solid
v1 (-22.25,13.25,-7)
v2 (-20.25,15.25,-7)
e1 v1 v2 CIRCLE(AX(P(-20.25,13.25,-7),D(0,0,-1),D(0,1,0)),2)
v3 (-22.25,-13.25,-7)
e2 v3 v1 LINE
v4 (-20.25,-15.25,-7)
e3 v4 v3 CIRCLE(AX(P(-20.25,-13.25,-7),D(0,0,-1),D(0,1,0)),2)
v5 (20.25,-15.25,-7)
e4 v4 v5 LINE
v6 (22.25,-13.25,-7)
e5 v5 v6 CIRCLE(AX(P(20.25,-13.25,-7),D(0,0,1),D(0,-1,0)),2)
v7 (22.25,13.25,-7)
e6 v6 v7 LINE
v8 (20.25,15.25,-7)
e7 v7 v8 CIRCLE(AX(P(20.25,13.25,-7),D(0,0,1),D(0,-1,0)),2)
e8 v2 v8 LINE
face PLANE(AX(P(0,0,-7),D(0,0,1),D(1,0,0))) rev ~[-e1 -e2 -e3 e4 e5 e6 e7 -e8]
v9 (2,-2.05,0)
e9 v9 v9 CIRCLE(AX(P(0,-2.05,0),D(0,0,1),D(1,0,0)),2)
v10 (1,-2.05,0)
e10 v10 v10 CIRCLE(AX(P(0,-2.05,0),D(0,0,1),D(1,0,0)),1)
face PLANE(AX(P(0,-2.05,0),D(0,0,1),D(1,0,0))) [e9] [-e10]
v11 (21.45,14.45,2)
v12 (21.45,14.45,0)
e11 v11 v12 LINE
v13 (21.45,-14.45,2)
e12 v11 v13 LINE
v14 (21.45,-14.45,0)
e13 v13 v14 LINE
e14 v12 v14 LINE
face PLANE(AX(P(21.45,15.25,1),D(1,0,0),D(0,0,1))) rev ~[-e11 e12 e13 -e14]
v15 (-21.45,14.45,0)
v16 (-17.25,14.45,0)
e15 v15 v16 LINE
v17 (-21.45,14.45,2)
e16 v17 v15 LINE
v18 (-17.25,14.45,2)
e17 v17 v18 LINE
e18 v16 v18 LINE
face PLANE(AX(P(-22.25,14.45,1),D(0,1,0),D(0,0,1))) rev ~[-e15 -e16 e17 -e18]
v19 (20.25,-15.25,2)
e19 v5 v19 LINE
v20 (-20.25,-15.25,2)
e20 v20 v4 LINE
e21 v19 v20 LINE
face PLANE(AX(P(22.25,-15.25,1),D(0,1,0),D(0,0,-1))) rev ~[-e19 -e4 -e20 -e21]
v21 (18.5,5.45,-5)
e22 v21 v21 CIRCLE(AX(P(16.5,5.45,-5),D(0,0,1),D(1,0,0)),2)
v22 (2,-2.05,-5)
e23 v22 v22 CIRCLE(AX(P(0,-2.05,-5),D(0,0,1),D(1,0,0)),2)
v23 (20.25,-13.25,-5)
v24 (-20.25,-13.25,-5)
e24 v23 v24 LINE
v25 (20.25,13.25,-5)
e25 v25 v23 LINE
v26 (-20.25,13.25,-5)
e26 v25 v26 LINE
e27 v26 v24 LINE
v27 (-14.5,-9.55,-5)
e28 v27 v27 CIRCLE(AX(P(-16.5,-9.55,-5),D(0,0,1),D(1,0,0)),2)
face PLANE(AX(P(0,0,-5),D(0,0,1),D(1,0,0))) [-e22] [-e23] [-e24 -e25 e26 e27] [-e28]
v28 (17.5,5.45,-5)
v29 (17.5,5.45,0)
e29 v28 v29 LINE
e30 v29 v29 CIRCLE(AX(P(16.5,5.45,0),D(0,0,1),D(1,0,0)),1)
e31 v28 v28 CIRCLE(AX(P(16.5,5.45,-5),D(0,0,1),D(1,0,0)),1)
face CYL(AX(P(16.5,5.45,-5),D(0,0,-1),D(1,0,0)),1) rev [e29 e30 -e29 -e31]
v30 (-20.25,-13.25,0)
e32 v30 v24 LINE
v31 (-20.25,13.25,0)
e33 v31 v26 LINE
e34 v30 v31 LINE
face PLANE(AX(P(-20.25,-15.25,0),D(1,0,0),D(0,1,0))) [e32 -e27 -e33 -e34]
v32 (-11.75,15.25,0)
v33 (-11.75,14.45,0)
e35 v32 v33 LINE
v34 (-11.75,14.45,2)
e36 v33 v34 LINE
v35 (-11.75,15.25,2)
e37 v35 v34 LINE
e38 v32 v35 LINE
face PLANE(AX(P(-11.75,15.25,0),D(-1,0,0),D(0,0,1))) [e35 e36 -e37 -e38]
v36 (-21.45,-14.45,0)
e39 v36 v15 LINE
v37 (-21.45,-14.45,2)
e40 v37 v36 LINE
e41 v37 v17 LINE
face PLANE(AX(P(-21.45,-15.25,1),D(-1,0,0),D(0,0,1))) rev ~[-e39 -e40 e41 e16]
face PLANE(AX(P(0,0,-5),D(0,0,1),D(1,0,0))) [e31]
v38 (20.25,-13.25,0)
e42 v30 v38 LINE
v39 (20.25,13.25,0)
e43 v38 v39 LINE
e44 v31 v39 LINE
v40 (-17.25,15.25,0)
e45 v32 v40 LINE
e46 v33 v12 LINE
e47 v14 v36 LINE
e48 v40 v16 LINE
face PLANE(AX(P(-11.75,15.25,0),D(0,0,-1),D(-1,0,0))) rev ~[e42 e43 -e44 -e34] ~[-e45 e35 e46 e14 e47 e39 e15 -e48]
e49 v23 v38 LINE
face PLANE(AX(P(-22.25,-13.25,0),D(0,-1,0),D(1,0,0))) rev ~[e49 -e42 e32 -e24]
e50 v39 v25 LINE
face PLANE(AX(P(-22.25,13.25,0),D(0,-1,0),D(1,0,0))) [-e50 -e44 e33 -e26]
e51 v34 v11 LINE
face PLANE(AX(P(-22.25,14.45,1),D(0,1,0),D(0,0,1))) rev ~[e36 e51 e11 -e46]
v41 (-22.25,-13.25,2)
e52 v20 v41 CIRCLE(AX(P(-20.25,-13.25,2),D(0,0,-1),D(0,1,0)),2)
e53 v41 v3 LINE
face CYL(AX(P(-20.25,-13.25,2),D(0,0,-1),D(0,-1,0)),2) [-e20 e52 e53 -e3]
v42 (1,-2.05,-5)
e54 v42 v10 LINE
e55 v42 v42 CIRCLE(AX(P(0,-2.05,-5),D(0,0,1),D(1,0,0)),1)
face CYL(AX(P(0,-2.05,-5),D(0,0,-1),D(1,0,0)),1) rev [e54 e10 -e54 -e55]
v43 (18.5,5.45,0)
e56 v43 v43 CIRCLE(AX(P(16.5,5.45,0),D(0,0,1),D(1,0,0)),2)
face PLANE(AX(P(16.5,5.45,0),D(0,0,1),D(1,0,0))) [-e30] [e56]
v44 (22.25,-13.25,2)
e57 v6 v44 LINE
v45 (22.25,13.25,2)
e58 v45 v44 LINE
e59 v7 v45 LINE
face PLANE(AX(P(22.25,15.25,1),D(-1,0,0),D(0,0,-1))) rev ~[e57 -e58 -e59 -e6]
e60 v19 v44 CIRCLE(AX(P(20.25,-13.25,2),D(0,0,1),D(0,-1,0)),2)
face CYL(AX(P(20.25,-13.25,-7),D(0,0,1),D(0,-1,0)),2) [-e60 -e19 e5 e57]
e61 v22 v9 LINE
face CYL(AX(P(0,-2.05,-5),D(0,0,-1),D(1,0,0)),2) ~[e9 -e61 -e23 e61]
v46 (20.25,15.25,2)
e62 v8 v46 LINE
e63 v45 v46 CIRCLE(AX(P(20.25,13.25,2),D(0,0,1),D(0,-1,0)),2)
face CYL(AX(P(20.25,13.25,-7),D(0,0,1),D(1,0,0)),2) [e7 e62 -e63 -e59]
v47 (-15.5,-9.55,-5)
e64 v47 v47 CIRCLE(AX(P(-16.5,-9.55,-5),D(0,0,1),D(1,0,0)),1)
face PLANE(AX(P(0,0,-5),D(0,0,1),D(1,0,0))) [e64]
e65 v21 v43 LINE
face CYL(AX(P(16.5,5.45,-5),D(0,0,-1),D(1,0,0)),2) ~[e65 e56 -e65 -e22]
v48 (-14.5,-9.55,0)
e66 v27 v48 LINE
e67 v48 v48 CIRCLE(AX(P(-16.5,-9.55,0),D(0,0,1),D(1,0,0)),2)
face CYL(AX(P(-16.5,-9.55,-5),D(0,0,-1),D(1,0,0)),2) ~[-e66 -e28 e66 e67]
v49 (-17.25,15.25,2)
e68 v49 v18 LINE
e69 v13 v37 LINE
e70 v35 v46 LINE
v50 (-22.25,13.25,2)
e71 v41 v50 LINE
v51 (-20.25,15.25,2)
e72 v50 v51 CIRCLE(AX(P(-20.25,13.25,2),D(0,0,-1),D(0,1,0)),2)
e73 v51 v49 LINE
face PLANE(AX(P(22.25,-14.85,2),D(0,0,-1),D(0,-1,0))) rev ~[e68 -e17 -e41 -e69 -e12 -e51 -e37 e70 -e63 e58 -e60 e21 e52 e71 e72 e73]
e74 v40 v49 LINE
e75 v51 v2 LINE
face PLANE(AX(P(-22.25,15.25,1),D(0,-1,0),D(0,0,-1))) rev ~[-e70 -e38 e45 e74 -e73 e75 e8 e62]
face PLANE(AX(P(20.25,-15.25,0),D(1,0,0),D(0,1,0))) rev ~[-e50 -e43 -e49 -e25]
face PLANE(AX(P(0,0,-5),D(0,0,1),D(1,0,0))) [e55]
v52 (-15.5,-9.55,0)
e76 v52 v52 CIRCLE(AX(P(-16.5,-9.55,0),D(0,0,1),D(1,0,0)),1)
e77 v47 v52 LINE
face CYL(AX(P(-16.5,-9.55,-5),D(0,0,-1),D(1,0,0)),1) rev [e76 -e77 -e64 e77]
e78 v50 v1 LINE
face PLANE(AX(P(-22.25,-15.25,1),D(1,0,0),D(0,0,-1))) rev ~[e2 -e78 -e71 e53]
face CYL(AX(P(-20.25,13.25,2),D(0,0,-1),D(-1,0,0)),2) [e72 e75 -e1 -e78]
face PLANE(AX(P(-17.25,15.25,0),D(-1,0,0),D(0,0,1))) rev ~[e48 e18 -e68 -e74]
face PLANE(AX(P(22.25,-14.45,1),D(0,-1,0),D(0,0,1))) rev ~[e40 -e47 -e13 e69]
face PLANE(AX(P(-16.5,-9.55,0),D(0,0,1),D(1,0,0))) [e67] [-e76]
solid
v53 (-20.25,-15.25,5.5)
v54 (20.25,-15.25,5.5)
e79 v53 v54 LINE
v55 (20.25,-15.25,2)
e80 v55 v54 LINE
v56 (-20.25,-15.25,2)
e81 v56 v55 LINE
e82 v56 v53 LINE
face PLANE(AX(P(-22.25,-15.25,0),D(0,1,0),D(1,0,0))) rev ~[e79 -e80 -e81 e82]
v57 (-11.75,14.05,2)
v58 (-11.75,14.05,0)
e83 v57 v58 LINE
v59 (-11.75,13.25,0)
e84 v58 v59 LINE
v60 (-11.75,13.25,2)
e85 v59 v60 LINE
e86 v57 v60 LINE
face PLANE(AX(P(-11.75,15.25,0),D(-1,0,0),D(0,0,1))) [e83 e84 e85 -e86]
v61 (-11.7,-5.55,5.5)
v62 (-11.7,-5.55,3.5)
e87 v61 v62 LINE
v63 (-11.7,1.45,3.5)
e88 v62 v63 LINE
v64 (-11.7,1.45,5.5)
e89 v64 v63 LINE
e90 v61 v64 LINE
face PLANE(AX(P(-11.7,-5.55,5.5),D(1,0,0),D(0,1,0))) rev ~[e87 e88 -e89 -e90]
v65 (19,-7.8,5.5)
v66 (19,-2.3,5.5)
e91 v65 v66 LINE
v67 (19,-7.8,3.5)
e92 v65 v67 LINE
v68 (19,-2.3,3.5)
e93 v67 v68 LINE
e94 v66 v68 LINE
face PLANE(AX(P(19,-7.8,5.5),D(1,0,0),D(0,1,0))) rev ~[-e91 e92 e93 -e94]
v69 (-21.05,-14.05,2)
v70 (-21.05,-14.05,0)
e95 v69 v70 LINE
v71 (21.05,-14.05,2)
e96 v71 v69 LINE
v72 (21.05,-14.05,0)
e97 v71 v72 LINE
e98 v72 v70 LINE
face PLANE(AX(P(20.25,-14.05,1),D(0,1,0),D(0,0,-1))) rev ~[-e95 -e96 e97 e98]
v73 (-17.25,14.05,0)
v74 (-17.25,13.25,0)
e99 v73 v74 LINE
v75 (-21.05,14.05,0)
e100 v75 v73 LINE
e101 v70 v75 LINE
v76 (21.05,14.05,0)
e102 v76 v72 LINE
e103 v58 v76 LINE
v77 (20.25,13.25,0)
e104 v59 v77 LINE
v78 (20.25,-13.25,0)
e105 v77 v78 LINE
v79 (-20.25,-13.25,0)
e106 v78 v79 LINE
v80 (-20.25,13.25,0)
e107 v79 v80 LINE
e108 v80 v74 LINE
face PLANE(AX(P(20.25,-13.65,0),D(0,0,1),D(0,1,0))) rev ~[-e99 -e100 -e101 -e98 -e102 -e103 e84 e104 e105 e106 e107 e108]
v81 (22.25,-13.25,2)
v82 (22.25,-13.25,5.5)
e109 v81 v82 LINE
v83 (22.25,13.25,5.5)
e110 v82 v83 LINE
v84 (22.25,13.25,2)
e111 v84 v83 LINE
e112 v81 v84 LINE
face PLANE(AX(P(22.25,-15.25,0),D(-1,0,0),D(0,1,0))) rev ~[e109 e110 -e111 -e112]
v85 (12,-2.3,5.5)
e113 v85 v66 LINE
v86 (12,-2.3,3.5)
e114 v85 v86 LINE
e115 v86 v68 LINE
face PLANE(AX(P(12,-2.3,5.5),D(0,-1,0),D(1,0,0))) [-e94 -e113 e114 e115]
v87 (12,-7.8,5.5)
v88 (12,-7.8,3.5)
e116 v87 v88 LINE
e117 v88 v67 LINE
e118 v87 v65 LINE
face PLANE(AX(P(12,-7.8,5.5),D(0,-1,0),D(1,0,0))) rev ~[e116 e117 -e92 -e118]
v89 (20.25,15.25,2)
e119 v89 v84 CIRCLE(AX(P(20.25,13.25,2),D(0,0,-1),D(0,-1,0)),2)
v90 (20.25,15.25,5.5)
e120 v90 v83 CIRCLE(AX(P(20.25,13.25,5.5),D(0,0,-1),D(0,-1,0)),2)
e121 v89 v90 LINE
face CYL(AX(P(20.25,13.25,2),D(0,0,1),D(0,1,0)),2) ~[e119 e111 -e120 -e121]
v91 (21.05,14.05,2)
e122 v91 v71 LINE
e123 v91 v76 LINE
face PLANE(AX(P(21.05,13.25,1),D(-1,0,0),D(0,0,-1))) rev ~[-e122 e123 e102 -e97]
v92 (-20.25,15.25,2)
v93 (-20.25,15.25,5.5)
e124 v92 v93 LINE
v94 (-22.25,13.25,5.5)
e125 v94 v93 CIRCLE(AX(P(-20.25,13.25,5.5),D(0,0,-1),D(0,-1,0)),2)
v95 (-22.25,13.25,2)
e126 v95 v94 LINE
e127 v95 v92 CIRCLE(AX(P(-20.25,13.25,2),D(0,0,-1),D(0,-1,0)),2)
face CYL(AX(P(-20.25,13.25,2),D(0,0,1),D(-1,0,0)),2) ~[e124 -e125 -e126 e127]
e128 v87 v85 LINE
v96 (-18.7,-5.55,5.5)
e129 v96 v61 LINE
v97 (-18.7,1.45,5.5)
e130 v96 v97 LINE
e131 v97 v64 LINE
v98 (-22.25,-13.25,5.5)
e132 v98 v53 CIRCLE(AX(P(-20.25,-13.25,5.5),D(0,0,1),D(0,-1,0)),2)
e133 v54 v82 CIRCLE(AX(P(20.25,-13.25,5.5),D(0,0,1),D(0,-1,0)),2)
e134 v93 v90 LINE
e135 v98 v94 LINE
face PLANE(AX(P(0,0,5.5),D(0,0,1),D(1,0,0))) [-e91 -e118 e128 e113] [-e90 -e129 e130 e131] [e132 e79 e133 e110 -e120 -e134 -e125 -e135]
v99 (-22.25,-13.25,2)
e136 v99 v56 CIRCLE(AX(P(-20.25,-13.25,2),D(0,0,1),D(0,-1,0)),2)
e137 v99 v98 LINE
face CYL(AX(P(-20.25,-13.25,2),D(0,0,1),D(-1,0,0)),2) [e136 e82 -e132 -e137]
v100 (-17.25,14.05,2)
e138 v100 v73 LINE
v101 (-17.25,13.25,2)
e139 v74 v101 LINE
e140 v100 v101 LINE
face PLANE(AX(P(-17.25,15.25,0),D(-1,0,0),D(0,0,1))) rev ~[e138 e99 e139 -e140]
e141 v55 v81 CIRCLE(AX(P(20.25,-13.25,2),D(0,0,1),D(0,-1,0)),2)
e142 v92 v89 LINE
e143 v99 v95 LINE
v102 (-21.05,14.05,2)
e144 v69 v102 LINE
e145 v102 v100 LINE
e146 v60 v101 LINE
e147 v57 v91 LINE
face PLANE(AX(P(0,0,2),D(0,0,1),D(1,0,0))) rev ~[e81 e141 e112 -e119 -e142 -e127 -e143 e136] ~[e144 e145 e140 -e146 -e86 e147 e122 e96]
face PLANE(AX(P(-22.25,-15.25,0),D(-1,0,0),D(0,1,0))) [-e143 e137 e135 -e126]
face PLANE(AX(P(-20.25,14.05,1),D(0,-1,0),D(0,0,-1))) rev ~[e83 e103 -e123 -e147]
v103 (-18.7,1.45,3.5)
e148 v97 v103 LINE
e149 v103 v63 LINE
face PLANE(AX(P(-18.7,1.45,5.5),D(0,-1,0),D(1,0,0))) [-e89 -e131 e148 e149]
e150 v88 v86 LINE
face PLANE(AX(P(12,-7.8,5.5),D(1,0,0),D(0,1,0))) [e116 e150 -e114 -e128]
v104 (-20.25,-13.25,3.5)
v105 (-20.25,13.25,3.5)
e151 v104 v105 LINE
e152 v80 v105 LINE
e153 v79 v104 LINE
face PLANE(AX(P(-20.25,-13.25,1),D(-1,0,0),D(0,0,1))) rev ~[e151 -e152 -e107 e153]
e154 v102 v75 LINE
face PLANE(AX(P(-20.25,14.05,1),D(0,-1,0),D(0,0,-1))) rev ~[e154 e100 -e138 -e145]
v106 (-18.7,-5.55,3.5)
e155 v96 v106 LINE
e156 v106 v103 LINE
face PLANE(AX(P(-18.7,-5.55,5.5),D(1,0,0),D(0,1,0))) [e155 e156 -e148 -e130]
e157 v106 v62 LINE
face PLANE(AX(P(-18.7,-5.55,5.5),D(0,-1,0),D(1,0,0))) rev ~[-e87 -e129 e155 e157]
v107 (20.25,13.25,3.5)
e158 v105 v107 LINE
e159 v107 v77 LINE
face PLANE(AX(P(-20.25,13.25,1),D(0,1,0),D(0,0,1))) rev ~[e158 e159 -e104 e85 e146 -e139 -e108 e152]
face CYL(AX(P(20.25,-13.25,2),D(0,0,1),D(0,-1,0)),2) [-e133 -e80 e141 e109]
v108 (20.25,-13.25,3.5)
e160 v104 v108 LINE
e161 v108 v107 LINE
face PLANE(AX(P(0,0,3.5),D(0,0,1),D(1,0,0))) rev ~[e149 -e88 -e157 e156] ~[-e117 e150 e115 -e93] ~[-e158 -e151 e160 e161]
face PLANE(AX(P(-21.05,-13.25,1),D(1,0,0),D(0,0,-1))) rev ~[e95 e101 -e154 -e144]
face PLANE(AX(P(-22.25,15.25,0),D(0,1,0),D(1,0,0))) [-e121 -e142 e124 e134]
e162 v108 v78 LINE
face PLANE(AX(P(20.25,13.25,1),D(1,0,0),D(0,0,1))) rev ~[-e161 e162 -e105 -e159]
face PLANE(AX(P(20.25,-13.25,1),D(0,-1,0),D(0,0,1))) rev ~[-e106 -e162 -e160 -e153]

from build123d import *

# Parameters (mm, degrees)
F0_W      = 44.5
F0_H      = 30.5
F1_DEPTH  = 7
F2_T      = -2
F3_DEPTH  = 5.5
F4_T      = -2
F6_DEPTH  = 2
F5_W      = 0.8
F5_H      = 2
F9_R      = 2
F9_R_2    = 1
F10_DEPTH = 5
F11_W     = 7
F11_H     = 7
F11_H_2   = 5.5
F12_DEPTH = 2
F13_R     = 2
F13_2_R   = 2
F14_W     = 5.5
F14_H     = 2
F15_DEPTH = 2


with BuildPart() as f1:
    # F0 (on Top) → F1 (new body)
    with BuildSketch(Plane.XY):
        Rectangle(F0_W, F0_H)
    extrude(amount=-F1_DEPTH)

    # F2
    f2_openings = [f1.faces().sort_by_distance(p)[0] for p in [
        (0, 0, 0),
    ]]
    offset(amount=F2_T, openings=f2_openings)

    # F8: sweep along a path in F0
    with BuildLine(Plane.XY) as f8_path:
        Line((22.25, -15.25), (-22.25, -15.25))
        Line((-22.25, -15.25), (-22.25, 15.25))
        Line((-22.25, 15.25), (22.25, 15.25))
        Line((22.25, 15.25), (22.25, -15.25))
    # F5 (on Right) → F8 (sweep)
    with BuildSketch(Plane.YZ):
        with Locations((-14.85, 1)):
            Rectangle(F5_W, F5_H)
    sweep(path=f8_path.line, transition=Transition.RIGHT)

    # F9 (on face) → F10 (join)
    with BuildSketch(Plane.XY.offset(-5)):
        with Locations((0, -2.05)):
            Circle(F9_R)
        with Locations((0, -2.05)):
            Circle(F9_R_2, mode=Mode.SUBTRACT)
        with Locations((-16.5, -9.55)):
            Circle(F9_R)
        with Locations((-16.5, -9.55)):
            Circle(F9_R_2, mode=Mode.SUBTRACT)
        with Locations((16.5, 5.45)):
            Circle(F9_R)
        with Locations((16.5, 5.45)):
            Circle(F9_R_2, mode=Mode.SUBTRACT)
    extrude(amount=F10_DEPTH)

    # F13
    f13_edges = [f1.edges().sort_by_distance(p)[0] for p in [
        (22.25, 15.25, -2.5),
        (22.25, -15.25, -2.5),
        (-22.25, -15.25, -2.5),
        (-22.25, 15.25, -2.5),
    ]]
    fillet(f13_edges, radius=F13_R)


with BuildPart() as f3:
    # F0 (on Top) → F3 (new body)
    with BuildSketch(Plane.XY):
        Rectangle(F0_W, F0_H)
    extrude(amount=F3_DEPTH)

    # F4
    f4_openings = [f3.faces().sort_by_distance(p)[0] for p in [
        (0, 0, 0),
    ]]
    offset(amount=F4_T, openings=f4_openings)

    # F0 (on Top) → F6 (cut)
    with BuildSketch(Plane.XY):
        Rectangle(F0_W, F0_H)
    extrude(amount=F6_DEPTH, mode=Mode.SUBTRACT)

    # F7: sweep along a path in F7_path
    with BuildLine(Plane(origin=(20.25, -13.25, 2), x_dir=(0, 1, 0), z_dir=(0, 0, 1))) as f7_path:
        Line((0, 0), (0, 40.5))
        Line((0, 40.5), (26.5, 40.5))
        Line((26.5, 40.5), (26.5, 0))
        Line((26.5, 0), (0, 0))
    # F5 (on Right) → F7 (sweep)
    with BuildSketch(Plane.YZ):
        with Locations((-13.65, 1)):
            Rectangle(F5_W, F5_H)
    sweep(path=f7_path.line, transition=Transition.RIGHT)

    # F11 (on face) → F12 (cut, through all)
    with BuildSketch(Plane.XY.offset(5.5)):
        with Locations((-15.2, -2.05)):
            Rectangle(F11_W, F11_H)
        with Locations((15.5, -5.05)):
            Rectangle(F11_W, F11_H_2)
    extrude(amount=-F12_DEPTH, mode=Mode.SUBTRACT)

    # F13#2
    f13_2_edges = [f3.edges().sort_by_distance(p)[0] for p in [
        (-22.25, -15.25, 3.75),
        (-22.25, 15.25, 3.75),
        (22.25, -15.25, 3.75),
        (22.25, 15.25, 3.75),
    ]]
    fillet(f13_2_edges, radius=F13_2_R)


with BuildPart() as f15_tool:
    # F14 (on face) → F15 (new body)
    with BuildSketch(Plane(origin=(0, 15.25, 0), x_dir=(-1, 0, 0), z_dir=(0, 1, 0))):
        with Locations((14.5, 1)):
            Rectangle(F14_W, F14_H)
    extrude(amount=-F15_DEPTH)


with BuildPart() as f1_1:
    add(f1.part)

    # F15: cut by f15_tool
    add(f15_tool.part, mode=Mode.SUBTRACT)


with BuildPart() as f3_1:
    add(f3.part)

    # F15: cut by f15_tool
    add(f15_tool.part, mode=Mode.SUBTRACT)


solid = Compound([f1_1.part, f3_1.part])
